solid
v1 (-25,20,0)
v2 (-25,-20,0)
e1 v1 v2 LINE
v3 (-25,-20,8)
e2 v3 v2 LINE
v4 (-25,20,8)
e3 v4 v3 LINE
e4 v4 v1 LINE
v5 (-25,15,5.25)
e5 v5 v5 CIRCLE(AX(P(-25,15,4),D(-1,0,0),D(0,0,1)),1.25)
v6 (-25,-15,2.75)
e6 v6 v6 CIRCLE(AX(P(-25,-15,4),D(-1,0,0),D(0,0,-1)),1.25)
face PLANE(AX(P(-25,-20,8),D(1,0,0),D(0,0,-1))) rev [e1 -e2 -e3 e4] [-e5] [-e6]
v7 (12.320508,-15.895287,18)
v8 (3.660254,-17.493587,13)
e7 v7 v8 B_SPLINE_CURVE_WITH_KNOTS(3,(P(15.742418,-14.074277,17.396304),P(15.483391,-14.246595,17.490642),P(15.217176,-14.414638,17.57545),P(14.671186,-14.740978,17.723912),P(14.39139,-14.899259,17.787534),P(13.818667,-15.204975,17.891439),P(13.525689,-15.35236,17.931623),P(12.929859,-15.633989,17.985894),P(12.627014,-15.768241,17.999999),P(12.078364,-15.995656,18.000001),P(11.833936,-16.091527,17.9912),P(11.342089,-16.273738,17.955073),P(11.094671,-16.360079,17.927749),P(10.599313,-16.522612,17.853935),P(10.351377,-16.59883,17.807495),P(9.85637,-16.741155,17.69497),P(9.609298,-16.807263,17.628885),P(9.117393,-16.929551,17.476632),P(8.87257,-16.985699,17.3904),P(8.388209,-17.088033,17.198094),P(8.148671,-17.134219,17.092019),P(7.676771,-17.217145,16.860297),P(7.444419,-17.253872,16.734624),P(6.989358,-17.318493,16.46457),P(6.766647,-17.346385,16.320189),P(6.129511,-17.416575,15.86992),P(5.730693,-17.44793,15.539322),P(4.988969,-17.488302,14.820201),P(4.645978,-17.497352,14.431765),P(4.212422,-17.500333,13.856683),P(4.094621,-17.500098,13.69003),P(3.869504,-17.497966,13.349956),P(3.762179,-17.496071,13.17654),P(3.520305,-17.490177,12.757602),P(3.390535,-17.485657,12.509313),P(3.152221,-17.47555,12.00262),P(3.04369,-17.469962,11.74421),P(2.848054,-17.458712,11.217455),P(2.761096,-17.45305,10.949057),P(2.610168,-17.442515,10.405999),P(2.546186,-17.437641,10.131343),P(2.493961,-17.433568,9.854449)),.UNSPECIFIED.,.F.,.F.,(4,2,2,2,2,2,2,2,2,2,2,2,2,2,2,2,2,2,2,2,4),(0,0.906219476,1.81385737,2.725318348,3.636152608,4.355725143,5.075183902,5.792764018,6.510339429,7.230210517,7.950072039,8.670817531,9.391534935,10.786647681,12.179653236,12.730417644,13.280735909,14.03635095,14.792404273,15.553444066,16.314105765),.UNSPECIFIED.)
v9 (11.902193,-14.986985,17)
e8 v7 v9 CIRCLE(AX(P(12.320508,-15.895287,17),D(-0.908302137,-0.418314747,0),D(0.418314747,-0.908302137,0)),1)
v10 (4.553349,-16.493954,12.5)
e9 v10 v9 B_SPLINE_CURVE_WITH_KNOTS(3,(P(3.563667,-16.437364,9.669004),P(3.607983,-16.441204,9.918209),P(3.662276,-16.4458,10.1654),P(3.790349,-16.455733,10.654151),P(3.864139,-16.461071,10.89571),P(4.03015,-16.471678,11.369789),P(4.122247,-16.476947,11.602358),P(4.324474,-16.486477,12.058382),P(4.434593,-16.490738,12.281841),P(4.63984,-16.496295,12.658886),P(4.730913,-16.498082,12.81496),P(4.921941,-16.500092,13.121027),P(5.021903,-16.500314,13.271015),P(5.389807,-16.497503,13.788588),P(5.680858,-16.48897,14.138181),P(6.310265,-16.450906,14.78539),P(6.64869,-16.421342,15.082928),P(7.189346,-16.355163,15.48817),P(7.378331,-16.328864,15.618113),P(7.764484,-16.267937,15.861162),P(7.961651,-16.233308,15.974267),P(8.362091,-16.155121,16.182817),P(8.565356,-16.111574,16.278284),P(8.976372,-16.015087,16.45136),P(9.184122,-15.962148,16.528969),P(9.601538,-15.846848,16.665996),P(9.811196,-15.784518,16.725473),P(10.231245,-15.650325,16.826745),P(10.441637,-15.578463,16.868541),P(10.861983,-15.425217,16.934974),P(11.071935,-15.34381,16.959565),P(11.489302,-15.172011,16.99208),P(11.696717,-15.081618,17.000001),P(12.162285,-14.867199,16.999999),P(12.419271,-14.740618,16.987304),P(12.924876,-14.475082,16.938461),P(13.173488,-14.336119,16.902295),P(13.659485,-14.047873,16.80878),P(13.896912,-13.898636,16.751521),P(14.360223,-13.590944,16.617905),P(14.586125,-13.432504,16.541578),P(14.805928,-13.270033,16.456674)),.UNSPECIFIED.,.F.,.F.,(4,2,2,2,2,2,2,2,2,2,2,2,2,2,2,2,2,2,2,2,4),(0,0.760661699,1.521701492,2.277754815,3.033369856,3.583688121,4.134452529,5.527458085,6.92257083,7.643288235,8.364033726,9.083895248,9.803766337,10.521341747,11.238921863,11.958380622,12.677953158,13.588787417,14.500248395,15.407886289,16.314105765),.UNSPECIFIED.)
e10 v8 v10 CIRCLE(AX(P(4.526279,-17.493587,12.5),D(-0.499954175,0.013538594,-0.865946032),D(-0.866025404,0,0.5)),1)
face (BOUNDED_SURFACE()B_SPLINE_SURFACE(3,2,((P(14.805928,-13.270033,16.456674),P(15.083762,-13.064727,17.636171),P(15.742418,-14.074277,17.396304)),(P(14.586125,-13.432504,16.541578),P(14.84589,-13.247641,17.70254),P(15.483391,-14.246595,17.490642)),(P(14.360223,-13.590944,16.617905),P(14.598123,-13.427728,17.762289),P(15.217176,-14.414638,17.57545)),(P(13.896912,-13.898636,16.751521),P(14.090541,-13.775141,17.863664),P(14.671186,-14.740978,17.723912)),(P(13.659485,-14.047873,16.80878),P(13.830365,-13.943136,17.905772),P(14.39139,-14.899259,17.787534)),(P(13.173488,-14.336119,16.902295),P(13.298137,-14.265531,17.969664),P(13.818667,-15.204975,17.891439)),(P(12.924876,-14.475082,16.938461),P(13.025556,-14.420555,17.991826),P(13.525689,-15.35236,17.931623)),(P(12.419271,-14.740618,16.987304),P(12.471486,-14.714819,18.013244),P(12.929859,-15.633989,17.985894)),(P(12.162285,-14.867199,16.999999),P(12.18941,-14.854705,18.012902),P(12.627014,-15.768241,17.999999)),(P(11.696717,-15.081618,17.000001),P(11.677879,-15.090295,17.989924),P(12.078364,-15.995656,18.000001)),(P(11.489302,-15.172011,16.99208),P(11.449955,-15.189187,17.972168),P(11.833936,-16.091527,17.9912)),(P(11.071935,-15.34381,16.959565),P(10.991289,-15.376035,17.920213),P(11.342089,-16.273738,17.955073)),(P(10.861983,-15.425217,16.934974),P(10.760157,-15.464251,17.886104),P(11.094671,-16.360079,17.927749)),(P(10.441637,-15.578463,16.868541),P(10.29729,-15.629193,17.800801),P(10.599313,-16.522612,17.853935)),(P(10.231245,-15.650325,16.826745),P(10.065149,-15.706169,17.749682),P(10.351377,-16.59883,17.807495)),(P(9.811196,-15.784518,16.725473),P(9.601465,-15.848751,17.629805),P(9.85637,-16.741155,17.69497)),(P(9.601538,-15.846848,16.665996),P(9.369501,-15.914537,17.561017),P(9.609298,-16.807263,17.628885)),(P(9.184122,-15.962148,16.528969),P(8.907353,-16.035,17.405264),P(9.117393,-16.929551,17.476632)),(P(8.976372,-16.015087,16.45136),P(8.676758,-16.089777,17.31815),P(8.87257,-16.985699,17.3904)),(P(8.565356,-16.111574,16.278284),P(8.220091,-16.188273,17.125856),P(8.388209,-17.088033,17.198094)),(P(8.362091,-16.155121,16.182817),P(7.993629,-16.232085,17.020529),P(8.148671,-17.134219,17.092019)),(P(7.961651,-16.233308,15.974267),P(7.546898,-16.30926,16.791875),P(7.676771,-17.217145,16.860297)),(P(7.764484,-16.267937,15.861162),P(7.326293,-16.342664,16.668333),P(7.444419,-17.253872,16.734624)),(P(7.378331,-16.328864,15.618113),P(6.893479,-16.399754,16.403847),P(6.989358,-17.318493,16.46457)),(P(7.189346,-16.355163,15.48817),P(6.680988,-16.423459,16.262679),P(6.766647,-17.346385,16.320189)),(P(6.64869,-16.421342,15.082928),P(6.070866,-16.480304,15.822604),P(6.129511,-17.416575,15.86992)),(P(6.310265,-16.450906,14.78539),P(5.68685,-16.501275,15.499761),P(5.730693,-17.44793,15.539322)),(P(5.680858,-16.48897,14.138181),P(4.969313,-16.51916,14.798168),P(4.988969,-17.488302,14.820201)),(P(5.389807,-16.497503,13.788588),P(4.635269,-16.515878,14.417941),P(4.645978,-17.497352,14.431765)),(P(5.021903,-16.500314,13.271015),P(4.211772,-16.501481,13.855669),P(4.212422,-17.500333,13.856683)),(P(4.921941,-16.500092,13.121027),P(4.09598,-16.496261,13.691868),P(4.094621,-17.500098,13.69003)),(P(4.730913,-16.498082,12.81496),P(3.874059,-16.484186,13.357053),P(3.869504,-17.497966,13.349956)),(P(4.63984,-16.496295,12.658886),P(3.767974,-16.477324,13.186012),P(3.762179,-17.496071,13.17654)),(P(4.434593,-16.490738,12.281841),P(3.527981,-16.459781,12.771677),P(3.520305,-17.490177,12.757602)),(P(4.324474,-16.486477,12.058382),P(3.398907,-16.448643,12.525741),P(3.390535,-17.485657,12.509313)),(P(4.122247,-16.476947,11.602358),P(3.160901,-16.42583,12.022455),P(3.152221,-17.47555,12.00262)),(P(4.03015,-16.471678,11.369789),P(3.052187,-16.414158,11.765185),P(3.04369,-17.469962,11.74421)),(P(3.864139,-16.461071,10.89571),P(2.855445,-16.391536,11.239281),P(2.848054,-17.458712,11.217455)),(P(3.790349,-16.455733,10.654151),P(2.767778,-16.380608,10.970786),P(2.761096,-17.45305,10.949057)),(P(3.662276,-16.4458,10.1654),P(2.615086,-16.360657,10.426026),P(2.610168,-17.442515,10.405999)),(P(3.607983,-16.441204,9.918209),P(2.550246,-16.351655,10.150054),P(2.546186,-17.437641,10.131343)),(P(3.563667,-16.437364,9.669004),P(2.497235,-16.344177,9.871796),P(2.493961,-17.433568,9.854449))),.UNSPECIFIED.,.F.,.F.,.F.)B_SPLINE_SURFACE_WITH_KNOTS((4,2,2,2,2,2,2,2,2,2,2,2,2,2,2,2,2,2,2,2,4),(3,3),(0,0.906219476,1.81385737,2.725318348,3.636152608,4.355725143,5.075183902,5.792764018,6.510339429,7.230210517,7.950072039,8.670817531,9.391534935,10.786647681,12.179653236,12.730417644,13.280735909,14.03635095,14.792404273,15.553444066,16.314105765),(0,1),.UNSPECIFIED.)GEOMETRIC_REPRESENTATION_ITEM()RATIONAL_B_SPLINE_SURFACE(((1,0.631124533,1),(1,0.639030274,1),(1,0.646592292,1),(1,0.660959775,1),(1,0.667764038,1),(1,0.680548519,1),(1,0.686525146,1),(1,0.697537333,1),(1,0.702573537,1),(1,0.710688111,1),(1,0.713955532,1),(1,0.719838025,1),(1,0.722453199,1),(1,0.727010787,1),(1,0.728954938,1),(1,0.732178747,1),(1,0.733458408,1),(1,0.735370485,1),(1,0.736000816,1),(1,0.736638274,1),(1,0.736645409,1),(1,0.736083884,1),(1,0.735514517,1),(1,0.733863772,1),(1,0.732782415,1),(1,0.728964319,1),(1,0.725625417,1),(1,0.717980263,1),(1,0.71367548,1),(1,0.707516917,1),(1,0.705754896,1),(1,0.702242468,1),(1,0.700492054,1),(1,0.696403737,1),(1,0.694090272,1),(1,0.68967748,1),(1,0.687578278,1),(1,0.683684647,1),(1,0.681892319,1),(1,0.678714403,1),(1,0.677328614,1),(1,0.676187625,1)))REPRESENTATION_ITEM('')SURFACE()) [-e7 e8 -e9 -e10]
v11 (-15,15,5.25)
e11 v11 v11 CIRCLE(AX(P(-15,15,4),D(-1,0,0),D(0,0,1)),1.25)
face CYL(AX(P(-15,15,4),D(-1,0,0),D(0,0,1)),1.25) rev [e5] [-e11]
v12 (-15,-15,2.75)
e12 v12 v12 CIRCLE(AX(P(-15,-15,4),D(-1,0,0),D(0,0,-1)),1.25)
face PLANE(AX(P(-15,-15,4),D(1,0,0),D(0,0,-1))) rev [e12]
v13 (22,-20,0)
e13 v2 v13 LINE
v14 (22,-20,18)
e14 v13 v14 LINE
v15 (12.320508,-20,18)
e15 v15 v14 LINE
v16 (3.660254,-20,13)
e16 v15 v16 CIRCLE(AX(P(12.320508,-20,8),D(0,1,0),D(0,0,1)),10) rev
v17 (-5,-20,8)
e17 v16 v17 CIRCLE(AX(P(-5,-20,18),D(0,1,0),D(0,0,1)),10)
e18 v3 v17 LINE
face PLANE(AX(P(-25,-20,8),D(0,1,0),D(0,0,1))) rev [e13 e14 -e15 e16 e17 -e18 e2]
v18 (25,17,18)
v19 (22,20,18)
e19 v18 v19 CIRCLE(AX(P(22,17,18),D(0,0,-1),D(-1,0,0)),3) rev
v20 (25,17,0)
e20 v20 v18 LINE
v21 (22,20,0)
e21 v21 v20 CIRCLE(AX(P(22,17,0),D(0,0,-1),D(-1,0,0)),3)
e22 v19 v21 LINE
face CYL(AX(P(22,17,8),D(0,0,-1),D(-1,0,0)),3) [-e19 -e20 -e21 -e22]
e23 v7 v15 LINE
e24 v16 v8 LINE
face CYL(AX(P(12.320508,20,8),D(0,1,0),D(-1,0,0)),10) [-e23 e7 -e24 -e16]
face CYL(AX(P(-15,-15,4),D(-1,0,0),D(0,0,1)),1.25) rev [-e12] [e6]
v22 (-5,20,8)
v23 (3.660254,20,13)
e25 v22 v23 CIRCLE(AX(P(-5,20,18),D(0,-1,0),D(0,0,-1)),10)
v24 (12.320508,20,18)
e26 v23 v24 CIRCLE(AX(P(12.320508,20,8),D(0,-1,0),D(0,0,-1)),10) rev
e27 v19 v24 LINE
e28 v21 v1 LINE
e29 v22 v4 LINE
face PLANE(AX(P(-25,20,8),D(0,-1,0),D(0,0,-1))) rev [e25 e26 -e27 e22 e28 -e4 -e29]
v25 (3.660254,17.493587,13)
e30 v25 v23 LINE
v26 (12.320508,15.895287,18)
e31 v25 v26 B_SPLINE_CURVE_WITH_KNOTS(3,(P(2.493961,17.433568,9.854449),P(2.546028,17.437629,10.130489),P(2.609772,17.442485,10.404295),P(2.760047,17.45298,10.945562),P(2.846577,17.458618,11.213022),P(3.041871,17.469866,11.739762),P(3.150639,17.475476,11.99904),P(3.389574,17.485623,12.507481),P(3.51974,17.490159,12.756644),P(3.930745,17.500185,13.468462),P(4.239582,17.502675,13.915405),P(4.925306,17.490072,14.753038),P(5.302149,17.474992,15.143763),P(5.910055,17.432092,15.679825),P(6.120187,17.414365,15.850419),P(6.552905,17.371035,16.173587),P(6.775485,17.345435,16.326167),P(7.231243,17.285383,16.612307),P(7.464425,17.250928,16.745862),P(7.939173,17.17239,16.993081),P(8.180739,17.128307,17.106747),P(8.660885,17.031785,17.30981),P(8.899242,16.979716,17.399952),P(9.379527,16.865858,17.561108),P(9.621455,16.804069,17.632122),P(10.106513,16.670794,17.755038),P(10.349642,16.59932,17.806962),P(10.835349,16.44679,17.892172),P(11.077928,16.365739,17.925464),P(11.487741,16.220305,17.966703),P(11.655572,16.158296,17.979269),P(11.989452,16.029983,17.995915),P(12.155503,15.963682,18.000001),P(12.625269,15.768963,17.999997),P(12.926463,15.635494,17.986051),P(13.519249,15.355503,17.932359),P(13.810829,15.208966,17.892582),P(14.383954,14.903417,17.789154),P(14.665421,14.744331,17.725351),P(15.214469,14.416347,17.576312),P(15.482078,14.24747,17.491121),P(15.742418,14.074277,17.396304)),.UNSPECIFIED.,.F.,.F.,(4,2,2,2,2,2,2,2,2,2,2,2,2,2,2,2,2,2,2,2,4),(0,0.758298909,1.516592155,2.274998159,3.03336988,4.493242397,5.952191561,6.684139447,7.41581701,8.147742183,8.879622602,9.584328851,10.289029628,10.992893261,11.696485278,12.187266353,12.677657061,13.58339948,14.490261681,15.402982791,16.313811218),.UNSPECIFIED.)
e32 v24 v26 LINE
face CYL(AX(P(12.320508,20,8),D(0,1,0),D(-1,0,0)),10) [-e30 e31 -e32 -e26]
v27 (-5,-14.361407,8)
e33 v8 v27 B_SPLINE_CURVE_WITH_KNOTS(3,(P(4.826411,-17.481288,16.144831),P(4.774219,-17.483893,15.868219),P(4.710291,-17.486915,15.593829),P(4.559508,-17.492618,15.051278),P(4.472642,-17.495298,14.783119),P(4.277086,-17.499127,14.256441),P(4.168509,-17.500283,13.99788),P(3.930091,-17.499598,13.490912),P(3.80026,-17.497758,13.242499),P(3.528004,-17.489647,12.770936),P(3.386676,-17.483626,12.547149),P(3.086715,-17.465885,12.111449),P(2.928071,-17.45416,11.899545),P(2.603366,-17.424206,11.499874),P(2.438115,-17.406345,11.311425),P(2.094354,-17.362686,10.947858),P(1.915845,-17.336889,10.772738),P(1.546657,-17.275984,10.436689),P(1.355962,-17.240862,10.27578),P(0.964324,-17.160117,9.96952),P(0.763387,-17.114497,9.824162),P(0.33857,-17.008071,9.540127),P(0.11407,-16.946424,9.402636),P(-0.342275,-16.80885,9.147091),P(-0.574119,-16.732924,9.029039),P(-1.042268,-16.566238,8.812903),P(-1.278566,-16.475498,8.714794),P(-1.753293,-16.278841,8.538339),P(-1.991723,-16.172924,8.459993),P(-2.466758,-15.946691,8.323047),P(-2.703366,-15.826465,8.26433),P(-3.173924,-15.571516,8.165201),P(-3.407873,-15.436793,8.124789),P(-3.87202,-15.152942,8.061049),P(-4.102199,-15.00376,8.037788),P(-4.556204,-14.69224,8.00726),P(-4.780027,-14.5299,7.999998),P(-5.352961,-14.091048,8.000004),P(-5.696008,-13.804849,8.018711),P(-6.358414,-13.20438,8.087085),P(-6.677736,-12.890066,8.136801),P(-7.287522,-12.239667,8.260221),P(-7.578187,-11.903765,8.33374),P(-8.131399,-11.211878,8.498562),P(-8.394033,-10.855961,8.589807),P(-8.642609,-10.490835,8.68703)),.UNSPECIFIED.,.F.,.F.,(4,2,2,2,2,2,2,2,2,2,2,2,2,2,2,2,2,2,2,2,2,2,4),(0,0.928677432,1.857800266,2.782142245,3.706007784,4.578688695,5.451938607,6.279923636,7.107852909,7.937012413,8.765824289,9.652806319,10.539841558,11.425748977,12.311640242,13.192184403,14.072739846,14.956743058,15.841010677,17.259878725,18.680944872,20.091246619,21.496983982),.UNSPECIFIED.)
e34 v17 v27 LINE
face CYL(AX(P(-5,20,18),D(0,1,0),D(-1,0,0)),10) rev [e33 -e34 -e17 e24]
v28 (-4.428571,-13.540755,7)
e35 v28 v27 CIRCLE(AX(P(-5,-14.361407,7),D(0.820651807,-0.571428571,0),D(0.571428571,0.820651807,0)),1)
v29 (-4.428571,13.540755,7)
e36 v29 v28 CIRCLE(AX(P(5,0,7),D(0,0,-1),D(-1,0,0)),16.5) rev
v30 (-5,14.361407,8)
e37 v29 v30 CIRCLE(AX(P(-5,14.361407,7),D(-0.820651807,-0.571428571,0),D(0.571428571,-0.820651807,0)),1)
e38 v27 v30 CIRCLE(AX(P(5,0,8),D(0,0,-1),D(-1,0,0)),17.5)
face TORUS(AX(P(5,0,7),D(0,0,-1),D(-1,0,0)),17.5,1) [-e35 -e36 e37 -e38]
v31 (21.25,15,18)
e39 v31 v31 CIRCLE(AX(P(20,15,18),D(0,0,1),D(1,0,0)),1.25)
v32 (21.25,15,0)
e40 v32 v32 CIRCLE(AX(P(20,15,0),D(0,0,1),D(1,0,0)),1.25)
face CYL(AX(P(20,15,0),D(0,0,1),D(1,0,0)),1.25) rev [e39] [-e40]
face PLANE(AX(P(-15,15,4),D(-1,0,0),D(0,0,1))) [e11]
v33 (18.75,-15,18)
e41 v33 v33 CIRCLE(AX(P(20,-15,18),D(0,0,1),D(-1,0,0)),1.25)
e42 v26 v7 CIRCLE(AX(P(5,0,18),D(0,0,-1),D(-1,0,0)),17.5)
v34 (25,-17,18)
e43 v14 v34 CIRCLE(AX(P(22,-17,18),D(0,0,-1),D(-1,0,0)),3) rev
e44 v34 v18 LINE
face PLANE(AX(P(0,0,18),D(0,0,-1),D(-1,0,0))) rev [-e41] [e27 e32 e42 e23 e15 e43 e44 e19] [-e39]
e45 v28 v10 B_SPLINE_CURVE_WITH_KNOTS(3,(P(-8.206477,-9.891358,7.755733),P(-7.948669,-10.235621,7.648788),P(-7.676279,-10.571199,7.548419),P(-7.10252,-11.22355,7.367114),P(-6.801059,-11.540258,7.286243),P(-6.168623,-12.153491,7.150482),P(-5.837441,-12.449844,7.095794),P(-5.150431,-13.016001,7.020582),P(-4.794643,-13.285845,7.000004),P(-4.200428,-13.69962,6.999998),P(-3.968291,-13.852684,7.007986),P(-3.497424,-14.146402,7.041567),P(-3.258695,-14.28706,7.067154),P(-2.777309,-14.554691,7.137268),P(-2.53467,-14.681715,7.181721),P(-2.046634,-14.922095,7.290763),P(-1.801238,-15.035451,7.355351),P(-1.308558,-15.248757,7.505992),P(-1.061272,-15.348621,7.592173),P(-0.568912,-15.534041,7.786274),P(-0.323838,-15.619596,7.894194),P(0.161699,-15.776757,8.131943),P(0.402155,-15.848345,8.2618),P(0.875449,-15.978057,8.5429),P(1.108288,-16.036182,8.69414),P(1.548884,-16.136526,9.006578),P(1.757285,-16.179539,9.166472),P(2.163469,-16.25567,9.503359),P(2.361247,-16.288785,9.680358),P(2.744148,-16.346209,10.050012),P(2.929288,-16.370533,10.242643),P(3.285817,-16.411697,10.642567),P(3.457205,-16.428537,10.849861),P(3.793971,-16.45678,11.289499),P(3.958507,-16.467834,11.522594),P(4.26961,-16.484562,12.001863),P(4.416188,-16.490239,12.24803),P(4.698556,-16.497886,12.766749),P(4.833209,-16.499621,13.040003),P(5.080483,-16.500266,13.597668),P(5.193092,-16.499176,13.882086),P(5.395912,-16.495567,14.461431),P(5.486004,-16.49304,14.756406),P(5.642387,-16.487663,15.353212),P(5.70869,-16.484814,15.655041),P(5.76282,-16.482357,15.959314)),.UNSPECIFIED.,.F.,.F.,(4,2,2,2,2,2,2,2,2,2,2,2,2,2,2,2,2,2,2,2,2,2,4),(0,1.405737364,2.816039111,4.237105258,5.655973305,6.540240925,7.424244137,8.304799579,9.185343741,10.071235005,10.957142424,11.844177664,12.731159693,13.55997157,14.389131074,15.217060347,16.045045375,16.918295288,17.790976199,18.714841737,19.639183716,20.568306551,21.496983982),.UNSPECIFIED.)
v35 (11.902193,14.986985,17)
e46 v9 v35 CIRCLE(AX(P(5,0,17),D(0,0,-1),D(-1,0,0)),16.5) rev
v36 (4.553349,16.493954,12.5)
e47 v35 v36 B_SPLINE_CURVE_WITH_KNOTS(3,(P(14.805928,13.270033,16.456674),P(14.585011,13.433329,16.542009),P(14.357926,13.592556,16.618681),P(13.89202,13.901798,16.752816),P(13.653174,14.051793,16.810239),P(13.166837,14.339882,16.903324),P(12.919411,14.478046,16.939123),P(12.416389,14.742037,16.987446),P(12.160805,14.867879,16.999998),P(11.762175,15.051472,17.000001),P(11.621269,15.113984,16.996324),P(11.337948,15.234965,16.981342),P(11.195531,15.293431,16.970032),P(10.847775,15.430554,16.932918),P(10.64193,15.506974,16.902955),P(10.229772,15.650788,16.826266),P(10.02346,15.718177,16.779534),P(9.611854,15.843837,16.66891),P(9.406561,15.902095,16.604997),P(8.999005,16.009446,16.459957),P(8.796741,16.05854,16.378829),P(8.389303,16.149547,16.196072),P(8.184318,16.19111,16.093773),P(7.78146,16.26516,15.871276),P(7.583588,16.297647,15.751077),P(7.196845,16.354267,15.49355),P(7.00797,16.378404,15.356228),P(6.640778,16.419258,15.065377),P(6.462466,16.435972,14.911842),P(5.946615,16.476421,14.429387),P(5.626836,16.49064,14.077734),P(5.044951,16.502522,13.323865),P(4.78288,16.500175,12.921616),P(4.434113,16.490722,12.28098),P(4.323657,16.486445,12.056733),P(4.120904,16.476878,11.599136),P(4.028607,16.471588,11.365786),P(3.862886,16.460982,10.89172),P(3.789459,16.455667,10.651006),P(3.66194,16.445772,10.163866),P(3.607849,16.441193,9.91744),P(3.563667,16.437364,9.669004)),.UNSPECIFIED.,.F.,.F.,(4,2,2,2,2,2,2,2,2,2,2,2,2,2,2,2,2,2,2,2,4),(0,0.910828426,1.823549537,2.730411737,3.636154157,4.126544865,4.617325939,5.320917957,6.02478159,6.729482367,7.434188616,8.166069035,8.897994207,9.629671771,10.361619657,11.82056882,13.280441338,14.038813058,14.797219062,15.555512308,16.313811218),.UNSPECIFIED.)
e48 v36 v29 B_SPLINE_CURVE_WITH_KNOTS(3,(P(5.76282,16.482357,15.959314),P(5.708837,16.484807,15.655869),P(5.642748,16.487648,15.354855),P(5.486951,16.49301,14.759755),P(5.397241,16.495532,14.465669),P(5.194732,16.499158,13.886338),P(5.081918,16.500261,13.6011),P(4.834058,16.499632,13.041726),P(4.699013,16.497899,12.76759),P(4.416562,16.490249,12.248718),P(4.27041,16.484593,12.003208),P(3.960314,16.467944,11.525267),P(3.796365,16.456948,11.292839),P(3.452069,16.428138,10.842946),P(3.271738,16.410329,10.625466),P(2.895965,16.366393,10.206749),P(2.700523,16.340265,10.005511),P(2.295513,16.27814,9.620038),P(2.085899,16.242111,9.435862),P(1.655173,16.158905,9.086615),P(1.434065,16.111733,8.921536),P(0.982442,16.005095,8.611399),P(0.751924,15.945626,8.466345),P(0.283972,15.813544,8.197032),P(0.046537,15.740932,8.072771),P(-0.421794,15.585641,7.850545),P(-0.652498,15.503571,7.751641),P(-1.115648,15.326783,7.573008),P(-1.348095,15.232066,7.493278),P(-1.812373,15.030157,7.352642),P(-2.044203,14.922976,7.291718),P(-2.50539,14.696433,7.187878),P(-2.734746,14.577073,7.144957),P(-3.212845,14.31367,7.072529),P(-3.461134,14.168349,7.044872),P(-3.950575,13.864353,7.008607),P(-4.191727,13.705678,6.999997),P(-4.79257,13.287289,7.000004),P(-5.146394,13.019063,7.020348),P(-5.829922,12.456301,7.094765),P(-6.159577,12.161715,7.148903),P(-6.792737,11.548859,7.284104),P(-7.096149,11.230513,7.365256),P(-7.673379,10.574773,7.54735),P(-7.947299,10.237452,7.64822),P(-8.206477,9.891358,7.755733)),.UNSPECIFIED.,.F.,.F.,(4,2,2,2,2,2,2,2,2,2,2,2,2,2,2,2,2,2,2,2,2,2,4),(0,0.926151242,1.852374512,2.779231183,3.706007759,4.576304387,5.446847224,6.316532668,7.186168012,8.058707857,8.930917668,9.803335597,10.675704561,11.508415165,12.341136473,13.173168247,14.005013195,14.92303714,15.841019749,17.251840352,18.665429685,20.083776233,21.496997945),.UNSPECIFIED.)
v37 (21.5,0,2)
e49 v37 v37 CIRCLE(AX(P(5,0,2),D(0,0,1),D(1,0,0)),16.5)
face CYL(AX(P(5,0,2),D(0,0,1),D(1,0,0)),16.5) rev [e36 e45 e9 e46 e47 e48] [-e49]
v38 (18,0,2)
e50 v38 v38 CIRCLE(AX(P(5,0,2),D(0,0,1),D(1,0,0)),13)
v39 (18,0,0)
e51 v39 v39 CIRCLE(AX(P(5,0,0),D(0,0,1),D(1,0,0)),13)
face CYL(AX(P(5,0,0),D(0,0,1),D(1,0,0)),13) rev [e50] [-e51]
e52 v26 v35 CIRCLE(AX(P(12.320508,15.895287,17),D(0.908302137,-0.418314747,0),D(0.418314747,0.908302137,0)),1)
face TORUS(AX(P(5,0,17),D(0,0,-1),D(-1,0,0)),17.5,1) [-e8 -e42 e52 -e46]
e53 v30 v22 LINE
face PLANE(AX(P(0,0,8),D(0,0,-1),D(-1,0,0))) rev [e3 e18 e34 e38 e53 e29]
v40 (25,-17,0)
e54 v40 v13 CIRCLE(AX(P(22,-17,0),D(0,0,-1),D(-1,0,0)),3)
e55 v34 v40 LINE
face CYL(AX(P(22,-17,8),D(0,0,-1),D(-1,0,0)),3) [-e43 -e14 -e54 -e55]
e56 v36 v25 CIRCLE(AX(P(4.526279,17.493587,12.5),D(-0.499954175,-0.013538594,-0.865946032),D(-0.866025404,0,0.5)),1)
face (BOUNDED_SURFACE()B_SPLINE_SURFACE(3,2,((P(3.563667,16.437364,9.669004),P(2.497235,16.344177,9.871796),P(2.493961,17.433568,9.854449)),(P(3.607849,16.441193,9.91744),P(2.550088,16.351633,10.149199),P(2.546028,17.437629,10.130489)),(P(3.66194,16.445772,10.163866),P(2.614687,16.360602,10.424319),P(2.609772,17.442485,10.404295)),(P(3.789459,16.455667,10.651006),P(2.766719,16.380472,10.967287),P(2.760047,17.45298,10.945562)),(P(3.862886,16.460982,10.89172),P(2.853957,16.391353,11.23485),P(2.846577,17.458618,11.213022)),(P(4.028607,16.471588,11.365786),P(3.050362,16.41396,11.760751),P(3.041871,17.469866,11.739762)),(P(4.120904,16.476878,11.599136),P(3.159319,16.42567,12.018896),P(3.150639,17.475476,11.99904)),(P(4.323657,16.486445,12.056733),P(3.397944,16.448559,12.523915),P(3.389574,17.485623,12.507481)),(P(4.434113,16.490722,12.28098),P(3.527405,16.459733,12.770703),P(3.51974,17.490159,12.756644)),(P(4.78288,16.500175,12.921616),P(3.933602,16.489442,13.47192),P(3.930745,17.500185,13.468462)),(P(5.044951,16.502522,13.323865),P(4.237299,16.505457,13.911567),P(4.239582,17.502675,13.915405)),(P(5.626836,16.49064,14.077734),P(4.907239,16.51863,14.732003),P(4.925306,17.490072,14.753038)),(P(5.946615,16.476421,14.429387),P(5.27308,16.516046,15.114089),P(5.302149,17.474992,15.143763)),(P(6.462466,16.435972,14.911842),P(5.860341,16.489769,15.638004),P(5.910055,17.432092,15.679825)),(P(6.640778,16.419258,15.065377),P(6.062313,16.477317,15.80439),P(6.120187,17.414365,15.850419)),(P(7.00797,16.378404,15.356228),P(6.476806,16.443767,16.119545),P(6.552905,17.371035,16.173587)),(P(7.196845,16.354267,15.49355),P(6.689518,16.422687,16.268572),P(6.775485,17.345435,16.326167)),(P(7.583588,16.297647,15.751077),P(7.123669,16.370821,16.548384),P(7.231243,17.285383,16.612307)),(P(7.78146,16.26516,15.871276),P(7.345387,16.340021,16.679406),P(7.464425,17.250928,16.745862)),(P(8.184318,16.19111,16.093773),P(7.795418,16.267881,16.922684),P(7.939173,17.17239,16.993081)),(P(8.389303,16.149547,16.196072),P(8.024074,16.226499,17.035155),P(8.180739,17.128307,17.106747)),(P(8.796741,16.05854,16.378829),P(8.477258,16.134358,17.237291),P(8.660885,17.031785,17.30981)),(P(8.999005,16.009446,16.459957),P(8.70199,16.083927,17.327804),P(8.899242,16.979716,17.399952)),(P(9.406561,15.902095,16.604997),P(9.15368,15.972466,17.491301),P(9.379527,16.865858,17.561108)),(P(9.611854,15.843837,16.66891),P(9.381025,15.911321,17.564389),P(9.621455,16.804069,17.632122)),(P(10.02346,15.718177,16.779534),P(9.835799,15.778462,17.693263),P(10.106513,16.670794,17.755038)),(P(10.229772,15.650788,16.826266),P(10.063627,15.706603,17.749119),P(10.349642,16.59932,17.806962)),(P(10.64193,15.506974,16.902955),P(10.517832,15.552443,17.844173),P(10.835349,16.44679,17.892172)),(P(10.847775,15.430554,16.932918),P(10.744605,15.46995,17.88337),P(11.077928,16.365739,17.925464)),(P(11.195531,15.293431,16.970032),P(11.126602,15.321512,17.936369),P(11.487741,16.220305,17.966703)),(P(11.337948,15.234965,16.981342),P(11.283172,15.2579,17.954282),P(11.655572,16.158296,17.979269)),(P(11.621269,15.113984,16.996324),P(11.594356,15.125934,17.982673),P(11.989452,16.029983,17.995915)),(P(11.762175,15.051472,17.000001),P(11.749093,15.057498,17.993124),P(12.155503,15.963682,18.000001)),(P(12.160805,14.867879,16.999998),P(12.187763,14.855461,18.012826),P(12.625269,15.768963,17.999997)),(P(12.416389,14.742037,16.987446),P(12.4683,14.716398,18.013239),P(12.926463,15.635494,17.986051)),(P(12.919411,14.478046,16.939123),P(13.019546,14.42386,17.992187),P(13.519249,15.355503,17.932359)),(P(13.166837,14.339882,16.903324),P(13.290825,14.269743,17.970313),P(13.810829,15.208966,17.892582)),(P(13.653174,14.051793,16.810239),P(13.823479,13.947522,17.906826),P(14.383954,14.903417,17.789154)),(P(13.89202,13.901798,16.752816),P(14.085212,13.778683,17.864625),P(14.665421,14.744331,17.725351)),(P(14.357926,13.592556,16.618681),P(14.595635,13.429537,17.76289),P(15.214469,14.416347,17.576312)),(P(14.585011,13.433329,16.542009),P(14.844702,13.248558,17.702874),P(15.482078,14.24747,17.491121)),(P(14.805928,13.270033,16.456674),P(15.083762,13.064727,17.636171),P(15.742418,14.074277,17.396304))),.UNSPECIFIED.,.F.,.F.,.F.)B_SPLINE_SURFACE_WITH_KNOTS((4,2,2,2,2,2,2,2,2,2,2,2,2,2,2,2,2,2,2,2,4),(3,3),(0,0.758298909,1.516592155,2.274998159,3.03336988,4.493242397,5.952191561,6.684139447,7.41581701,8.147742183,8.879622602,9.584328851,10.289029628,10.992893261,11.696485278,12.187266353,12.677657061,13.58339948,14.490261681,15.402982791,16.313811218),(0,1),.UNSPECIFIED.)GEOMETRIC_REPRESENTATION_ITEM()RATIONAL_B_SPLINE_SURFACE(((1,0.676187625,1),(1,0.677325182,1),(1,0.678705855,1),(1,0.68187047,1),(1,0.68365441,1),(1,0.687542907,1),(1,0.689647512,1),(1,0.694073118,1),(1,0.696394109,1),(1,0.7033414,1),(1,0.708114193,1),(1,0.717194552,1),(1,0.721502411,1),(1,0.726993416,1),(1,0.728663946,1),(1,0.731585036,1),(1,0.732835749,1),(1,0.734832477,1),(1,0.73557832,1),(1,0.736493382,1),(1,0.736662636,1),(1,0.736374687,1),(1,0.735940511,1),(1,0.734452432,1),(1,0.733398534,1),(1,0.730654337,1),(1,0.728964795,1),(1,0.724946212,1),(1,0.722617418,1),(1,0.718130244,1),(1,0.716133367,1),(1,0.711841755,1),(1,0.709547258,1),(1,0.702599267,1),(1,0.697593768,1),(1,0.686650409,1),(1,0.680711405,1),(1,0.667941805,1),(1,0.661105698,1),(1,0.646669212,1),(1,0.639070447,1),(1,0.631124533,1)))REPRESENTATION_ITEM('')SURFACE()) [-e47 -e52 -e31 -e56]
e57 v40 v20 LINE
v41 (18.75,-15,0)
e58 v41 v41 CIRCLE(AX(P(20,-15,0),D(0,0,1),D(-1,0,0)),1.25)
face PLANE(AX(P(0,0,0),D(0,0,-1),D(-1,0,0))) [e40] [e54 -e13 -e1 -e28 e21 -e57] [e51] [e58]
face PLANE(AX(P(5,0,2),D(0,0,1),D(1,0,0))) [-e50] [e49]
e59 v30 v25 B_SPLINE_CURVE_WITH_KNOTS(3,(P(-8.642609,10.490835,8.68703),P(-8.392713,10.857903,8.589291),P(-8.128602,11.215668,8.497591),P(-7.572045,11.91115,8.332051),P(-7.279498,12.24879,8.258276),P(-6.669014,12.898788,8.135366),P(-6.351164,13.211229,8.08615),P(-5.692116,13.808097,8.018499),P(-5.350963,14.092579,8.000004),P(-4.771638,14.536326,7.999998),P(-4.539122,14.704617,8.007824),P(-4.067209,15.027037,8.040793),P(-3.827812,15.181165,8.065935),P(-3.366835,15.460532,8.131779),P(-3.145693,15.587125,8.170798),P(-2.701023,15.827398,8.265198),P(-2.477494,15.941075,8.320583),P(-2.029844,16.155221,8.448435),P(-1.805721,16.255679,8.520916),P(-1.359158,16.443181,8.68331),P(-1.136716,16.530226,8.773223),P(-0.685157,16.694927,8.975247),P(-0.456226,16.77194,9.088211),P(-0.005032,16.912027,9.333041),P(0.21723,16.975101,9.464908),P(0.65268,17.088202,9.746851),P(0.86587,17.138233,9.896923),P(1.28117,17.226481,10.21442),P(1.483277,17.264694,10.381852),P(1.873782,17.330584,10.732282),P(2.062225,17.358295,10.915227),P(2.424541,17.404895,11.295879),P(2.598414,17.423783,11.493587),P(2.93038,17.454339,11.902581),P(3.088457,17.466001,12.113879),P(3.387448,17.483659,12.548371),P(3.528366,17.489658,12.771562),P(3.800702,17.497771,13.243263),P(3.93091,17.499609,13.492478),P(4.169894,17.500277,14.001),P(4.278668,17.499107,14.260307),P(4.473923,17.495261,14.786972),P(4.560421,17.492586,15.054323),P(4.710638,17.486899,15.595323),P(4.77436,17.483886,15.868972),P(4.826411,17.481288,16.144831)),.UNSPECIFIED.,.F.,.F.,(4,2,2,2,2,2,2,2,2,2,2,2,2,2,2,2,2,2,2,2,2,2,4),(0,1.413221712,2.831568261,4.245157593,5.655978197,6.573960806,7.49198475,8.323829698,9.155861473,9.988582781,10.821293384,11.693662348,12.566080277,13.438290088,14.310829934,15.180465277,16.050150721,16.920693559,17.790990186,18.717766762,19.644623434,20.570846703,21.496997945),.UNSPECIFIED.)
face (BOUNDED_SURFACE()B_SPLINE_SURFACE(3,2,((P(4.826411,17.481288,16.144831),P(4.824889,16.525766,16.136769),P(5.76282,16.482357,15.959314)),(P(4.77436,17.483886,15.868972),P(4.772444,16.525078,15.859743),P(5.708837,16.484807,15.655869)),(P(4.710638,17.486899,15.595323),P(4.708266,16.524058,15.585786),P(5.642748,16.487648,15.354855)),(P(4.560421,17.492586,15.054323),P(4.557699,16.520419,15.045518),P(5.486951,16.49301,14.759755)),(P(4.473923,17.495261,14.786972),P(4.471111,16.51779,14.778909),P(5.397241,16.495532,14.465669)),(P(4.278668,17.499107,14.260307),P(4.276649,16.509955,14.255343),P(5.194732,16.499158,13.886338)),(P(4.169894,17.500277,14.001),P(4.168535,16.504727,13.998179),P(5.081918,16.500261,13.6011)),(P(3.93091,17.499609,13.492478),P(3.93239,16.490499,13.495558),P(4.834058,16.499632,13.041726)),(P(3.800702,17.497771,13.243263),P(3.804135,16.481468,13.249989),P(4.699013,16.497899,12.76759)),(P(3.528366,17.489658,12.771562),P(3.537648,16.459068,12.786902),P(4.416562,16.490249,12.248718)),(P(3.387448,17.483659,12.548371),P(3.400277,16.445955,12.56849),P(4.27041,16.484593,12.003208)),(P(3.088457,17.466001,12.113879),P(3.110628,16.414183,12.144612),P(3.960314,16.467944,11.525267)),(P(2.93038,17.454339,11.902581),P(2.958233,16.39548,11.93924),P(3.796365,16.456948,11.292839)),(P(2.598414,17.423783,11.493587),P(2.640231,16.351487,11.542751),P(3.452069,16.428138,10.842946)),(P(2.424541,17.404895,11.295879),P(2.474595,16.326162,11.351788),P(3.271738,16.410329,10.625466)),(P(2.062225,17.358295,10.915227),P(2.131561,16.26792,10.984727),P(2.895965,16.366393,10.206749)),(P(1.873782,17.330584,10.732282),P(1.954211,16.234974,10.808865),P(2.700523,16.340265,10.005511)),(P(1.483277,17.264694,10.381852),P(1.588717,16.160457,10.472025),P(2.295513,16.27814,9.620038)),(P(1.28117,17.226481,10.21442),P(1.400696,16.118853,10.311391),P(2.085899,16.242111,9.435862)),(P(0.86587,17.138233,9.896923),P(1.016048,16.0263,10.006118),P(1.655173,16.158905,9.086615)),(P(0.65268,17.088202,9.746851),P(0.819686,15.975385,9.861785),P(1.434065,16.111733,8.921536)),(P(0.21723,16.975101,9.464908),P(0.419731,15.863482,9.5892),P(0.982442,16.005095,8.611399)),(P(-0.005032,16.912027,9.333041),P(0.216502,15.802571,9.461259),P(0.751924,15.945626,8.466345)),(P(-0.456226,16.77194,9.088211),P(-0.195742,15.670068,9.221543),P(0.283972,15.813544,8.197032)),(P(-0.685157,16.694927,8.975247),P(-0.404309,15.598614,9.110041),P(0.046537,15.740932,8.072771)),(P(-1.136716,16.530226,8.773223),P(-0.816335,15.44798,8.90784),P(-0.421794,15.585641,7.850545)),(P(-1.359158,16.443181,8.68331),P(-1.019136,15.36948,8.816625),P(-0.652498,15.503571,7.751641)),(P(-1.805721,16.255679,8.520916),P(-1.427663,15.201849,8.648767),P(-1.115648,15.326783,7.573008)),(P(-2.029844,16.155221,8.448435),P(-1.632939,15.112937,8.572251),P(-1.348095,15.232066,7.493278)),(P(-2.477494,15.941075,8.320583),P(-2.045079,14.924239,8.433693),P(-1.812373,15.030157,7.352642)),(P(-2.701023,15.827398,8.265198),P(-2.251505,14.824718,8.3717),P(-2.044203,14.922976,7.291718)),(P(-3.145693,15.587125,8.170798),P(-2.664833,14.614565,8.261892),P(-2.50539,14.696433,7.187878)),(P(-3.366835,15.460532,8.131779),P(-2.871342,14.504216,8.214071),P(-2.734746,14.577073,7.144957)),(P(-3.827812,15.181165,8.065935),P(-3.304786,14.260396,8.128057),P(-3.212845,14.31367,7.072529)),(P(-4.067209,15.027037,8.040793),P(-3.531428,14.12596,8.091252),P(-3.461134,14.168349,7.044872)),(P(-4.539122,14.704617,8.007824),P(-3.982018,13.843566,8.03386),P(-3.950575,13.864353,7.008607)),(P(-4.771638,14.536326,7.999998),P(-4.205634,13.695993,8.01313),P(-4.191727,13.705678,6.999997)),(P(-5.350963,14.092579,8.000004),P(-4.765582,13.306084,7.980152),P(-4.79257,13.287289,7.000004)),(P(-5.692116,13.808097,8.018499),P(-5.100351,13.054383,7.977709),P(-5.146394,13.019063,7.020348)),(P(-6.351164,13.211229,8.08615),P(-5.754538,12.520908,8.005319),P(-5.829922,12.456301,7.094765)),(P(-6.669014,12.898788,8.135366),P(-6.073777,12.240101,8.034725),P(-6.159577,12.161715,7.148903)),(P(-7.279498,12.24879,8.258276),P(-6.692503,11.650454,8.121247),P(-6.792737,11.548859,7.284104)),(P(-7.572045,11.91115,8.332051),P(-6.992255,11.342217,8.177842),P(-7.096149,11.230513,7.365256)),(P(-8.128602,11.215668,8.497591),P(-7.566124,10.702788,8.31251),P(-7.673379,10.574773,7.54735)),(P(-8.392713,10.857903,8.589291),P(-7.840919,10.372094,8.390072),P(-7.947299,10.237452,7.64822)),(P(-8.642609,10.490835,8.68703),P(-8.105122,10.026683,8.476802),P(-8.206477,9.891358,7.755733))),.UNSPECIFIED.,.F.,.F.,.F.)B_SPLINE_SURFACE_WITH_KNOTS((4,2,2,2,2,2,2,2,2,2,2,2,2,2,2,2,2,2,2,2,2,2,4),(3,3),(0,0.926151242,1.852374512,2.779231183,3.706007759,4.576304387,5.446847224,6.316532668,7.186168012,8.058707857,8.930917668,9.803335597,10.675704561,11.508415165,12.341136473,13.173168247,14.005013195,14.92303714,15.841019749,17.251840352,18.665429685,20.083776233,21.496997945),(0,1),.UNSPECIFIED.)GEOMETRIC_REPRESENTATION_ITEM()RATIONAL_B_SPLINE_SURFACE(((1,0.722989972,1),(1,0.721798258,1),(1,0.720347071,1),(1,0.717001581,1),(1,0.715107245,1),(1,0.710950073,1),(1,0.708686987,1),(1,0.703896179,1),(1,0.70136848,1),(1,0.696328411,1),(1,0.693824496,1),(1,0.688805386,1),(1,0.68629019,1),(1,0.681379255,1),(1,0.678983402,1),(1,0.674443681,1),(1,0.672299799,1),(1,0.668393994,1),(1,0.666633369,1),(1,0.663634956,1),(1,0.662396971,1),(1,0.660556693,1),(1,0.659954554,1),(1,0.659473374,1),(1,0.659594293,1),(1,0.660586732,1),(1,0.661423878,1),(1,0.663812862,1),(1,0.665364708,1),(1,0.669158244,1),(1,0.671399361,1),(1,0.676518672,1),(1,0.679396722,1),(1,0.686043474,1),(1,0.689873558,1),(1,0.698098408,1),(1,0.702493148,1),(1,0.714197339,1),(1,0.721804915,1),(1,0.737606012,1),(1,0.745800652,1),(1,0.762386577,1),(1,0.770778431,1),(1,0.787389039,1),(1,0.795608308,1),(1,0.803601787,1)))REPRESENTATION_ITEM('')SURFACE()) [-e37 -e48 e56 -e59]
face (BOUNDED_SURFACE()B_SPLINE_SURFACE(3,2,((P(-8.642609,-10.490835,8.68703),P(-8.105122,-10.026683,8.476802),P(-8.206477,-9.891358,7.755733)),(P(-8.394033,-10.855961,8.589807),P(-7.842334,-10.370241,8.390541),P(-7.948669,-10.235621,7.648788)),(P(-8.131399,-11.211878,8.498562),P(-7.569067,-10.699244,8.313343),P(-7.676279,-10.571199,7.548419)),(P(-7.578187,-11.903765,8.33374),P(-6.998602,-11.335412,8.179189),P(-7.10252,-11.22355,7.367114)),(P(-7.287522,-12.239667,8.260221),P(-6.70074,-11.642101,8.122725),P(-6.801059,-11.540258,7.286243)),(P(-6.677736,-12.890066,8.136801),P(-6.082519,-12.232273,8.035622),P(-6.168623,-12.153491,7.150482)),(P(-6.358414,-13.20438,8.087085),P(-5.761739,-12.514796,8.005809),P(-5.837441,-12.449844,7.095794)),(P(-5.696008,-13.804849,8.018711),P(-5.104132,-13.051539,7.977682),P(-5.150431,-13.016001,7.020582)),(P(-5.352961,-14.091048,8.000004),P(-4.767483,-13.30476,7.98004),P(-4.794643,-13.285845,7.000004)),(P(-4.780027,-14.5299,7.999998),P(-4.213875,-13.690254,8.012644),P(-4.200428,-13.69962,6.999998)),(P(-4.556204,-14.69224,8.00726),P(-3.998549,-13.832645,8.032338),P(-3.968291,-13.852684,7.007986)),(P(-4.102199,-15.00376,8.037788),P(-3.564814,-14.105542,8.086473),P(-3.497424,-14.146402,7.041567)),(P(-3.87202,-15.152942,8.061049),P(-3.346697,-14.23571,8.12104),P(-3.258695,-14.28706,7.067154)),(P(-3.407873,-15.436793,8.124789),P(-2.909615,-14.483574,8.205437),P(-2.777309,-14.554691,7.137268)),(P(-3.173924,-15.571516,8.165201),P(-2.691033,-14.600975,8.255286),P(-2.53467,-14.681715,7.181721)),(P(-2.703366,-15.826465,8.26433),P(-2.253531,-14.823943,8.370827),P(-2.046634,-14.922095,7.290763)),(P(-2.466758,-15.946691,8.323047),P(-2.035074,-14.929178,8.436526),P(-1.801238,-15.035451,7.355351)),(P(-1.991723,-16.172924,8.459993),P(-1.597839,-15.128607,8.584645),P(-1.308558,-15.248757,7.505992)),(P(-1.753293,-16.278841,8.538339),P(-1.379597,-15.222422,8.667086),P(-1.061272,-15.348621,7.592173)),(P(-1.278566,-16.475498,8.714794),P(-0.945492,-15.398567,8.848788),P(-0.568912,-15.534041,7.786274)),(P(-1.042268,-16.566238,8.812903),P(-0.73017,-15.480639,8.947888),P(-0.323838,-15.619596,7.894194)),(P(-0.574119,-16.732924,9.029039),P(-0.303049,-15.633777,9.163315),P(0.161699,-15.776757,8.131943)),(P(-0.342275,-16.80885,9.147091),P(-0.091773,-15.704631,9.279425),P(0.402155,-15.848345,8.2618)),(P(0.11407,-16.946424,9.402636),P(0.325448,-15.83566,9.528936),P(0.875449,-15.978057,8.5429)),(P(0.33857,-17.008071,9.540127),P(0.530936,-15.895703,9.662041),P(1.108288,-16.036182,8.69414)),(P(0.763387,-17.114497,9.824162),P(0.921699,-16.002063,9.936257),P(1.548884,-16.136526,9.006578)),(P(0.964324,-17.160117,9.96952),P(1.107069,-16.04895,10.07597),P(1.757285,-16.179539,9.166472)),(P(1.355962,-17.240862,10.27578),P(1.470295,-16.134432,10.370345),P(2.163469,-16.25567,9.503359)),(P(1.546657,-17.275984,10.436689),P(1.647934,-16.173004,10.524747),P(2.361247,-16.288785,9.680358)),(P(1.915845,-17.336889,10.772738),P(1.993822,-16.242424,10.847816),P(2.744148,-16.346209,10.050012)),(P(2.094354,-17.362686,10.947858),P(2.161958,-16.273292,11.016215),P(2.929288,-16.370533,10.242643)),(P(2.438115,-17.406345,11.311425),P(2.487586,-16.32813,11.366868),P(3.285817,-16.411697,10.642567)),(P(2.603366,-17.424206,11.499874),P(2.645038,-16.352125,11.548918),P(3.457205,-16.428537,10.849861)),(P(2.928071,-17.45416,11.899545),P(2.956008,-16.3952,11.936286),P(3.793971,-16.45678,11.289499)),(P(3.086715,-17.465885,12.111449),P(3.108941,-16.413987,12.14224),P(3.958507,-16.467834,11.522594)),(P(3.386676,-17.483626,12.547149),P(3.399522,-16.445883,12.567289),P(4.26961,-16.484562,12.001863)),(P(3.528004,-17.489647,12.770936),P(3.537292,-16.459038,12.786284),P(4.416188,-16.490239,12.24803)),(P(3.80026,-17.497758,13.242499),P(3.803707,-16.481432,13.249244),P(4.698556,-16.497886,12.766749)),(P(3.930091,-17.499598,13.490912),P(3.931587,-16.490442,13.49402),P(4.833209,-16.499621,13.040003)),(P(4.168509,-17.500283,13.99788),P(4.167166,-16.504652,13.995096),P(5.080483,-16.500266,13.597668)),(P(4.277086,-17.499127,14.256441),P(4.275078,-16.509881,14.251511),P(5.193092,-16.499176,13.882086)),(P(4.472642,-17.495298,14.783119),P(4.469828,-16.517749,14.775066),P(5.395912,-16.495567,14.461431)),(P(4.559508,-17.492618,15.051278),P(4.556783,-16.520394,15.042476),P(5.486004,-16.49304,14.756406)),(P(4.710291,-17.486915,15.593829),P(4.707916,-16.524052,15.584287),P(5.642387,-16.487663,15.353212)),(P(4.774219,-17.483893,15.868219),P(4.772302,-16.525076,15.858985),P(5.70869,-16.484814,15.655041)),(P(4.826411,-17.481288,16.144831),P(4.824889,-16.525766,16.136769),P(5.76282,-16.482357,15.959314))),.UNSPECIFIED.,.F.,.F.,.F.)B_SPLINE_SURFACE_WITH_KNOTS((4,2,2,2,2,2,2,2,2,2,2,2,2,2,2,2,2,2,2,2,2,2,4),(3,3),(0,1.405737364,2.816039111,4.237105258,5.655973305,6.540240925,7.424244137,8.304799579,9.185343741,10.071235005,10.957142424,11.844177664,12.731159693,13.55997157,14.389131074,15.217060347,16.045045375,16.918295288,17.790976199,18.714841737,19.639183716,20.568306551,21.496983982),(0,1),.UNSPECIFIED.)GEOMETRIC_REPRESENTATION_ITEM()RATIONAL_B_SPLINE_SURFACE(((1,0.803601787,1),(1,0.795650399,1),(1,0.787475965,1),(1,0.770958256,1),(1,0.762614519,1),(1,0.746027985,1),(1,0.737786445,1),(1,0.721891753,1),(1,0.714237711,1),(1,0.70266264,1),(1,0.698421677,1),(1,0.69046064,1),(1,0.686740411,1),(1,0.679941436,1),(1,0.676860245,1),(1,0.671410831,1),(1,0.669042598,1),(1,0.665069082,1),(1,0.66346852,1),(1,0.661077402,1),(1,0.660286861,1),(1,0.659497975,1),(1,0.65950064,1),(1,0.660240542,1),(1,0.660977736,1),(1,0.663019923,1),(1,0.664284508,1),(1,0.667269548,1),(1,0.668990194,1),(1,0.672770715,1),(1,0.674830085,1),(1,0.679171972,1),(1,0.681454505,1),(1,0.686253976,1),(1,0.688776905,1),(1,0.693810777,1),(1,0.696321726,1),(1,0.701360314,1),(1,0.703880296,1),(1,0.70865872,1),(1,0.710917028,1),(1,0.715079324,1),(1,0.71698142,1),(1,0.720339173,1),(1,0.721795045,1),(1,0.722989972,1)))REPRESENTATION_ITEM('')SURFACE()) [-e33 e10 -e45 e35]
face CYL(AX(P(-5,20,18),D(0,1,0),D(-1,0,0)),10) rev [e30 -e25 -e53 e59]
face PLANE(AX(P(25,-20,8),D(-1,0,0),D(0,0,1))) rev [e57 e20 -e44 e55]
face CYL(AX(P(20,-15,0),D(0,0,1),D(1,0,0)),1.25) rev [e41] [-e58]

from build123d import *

# Parameters (mm, degrees)
SKETCH_1_W          = 50
SKETCH_1_H          = 40
EXTRUDE_1_DEPTH     = 8
SKETCH_2_W          = 20
SKETCH_2_H          = 40
EXTRUDE_2_DEPTH     = 10
SKETCH_3_R          = 16.5
CUT_EXTRUDE_1_DEPTH = 16
SKETCH_5_R          = 1.25
CUT_EXTRUDE_2_DEPTH = 37.728735344
SKETCH_6_R          = 1.25
CUT_EXTRUDE_3_DEPTH = 10
FILLET_1_R          = 10
FILLET_2_R          = 10
FILLET_3_R          = 3
SKETCH_7_R          = 13
CUT_EXTRUDE_4_DEPTH = 36.791060507
FILLET_4_R          = 1


with BuildPart() as part:
    # 草图1 → 凸台-拉伸1 (new body)
    with BuildSketch(Plane.XY):
        Rectangle(SKETCH_1_W, SKETCH_1_H)
    extrude(amount=EXTRUDE_1_DEPTH)

    # 草图2 → 凸台-拉伸2 (add)
    with BuildSketch(Plane.XY.offset(8)):
        with Locations((15, 0)):
            Rectangle(SKETCH_2_W, SKETCH_2_H)
    extrude(amount=EXTRUDE_2_DEPTH)

    # 草图3 → 切除-拉伸1 (cut)
    with BuildSketch(Plane.XY.offset(18)):
        with Locations((5, 0)):
            Circle(SKETCH_3_R)
    extrude(amount=-CUT_EXTRUDE_1_DEPTH, mode=Mode.SUBTRACT)

    # 草图5 → 切除-拉伸2 (cut, through all)
    with BuildSketch(Plane.XY.offset(18)):
        with Locations((20, 15)):
            Circle(SKETCH_5_R)
        with Locations(Location((20, -15, 0), (0, 0, 180))):
            Circle(SKETCH_5_R)
    extrude(amount=-CUT_EXTRUDE_2_DEPTH, mode=Mode.SUBTRACT)

    # 草图6 → 切除-拉伸3 (cut)
    with BuildSketch(Plane.ZY.offset(25)):
        with Locations((4, 15)):
            Circle(SKETCH_6_R)
        with Locations(Location((4, -15, 0), (0, 0, 180))):
            Circle(SKETCH_6_R)
    extrude(amount=-CUT_EXTRUDE_3_DEPTH, mode=Mode.SUBTRACT)

    # 圆角1
    fillet_1_edges = [part.edges().sort_by_distance(p)[0] for p in [
        (5, -18.25, 8),
        (5, 18.25, 8),
    ]]
    fillet(fillet_1_edges, radius=FILLET_1_R - 0.0001)  # a hair under: the kernel refuses the full size

    # 圆角2
    fillet_2_edges = [part.edges().sort_by_distance(p)[0] for p in [
        (5, -18.25, 18),
        (5, 18.25, 18),
    ]]
    fillet(fillet_2_edges, radius=FILLET_2_R)

    # 圆角3
    fillet_3_edges = [part.edges().sort_by_distance(p)[0] for p in [
        (25, -20, 9),
        (25, 20, 9),
    ]]
    fillet(fillet_3_edges, radius=FILLET_3_R)

    # 草图7 → 切除-拉伸4 (cut, through all)
    with BuildSketch(Plane.XY.offset(2)):
        with Locations((5, 0)):
            Circle(SKETCH_7_R)
    extrude(amount=-CUT_EXTRUDE_4_DEPTH, mode=Mode.SUBTRACT)

    # 圆角4
    fillet_4_edges = [part.edges().sort_by_distance(p)[0] for p in [
        (-11.5, 0, 8),
        (-0.245631372, -15.643955751, 9.202461182),
        (19.018542731, -8.702324959, 18),
        (-0.245631372, 15.643955751, 9.202461182),
        (7.42567519, 16.320726083, 16.720103053),
        (7.42567519, -16.320726083, 16.720103053),
    ]]
    fillet(fillet_4_edges, radius=FILLET_4_R)


solid = part.part
